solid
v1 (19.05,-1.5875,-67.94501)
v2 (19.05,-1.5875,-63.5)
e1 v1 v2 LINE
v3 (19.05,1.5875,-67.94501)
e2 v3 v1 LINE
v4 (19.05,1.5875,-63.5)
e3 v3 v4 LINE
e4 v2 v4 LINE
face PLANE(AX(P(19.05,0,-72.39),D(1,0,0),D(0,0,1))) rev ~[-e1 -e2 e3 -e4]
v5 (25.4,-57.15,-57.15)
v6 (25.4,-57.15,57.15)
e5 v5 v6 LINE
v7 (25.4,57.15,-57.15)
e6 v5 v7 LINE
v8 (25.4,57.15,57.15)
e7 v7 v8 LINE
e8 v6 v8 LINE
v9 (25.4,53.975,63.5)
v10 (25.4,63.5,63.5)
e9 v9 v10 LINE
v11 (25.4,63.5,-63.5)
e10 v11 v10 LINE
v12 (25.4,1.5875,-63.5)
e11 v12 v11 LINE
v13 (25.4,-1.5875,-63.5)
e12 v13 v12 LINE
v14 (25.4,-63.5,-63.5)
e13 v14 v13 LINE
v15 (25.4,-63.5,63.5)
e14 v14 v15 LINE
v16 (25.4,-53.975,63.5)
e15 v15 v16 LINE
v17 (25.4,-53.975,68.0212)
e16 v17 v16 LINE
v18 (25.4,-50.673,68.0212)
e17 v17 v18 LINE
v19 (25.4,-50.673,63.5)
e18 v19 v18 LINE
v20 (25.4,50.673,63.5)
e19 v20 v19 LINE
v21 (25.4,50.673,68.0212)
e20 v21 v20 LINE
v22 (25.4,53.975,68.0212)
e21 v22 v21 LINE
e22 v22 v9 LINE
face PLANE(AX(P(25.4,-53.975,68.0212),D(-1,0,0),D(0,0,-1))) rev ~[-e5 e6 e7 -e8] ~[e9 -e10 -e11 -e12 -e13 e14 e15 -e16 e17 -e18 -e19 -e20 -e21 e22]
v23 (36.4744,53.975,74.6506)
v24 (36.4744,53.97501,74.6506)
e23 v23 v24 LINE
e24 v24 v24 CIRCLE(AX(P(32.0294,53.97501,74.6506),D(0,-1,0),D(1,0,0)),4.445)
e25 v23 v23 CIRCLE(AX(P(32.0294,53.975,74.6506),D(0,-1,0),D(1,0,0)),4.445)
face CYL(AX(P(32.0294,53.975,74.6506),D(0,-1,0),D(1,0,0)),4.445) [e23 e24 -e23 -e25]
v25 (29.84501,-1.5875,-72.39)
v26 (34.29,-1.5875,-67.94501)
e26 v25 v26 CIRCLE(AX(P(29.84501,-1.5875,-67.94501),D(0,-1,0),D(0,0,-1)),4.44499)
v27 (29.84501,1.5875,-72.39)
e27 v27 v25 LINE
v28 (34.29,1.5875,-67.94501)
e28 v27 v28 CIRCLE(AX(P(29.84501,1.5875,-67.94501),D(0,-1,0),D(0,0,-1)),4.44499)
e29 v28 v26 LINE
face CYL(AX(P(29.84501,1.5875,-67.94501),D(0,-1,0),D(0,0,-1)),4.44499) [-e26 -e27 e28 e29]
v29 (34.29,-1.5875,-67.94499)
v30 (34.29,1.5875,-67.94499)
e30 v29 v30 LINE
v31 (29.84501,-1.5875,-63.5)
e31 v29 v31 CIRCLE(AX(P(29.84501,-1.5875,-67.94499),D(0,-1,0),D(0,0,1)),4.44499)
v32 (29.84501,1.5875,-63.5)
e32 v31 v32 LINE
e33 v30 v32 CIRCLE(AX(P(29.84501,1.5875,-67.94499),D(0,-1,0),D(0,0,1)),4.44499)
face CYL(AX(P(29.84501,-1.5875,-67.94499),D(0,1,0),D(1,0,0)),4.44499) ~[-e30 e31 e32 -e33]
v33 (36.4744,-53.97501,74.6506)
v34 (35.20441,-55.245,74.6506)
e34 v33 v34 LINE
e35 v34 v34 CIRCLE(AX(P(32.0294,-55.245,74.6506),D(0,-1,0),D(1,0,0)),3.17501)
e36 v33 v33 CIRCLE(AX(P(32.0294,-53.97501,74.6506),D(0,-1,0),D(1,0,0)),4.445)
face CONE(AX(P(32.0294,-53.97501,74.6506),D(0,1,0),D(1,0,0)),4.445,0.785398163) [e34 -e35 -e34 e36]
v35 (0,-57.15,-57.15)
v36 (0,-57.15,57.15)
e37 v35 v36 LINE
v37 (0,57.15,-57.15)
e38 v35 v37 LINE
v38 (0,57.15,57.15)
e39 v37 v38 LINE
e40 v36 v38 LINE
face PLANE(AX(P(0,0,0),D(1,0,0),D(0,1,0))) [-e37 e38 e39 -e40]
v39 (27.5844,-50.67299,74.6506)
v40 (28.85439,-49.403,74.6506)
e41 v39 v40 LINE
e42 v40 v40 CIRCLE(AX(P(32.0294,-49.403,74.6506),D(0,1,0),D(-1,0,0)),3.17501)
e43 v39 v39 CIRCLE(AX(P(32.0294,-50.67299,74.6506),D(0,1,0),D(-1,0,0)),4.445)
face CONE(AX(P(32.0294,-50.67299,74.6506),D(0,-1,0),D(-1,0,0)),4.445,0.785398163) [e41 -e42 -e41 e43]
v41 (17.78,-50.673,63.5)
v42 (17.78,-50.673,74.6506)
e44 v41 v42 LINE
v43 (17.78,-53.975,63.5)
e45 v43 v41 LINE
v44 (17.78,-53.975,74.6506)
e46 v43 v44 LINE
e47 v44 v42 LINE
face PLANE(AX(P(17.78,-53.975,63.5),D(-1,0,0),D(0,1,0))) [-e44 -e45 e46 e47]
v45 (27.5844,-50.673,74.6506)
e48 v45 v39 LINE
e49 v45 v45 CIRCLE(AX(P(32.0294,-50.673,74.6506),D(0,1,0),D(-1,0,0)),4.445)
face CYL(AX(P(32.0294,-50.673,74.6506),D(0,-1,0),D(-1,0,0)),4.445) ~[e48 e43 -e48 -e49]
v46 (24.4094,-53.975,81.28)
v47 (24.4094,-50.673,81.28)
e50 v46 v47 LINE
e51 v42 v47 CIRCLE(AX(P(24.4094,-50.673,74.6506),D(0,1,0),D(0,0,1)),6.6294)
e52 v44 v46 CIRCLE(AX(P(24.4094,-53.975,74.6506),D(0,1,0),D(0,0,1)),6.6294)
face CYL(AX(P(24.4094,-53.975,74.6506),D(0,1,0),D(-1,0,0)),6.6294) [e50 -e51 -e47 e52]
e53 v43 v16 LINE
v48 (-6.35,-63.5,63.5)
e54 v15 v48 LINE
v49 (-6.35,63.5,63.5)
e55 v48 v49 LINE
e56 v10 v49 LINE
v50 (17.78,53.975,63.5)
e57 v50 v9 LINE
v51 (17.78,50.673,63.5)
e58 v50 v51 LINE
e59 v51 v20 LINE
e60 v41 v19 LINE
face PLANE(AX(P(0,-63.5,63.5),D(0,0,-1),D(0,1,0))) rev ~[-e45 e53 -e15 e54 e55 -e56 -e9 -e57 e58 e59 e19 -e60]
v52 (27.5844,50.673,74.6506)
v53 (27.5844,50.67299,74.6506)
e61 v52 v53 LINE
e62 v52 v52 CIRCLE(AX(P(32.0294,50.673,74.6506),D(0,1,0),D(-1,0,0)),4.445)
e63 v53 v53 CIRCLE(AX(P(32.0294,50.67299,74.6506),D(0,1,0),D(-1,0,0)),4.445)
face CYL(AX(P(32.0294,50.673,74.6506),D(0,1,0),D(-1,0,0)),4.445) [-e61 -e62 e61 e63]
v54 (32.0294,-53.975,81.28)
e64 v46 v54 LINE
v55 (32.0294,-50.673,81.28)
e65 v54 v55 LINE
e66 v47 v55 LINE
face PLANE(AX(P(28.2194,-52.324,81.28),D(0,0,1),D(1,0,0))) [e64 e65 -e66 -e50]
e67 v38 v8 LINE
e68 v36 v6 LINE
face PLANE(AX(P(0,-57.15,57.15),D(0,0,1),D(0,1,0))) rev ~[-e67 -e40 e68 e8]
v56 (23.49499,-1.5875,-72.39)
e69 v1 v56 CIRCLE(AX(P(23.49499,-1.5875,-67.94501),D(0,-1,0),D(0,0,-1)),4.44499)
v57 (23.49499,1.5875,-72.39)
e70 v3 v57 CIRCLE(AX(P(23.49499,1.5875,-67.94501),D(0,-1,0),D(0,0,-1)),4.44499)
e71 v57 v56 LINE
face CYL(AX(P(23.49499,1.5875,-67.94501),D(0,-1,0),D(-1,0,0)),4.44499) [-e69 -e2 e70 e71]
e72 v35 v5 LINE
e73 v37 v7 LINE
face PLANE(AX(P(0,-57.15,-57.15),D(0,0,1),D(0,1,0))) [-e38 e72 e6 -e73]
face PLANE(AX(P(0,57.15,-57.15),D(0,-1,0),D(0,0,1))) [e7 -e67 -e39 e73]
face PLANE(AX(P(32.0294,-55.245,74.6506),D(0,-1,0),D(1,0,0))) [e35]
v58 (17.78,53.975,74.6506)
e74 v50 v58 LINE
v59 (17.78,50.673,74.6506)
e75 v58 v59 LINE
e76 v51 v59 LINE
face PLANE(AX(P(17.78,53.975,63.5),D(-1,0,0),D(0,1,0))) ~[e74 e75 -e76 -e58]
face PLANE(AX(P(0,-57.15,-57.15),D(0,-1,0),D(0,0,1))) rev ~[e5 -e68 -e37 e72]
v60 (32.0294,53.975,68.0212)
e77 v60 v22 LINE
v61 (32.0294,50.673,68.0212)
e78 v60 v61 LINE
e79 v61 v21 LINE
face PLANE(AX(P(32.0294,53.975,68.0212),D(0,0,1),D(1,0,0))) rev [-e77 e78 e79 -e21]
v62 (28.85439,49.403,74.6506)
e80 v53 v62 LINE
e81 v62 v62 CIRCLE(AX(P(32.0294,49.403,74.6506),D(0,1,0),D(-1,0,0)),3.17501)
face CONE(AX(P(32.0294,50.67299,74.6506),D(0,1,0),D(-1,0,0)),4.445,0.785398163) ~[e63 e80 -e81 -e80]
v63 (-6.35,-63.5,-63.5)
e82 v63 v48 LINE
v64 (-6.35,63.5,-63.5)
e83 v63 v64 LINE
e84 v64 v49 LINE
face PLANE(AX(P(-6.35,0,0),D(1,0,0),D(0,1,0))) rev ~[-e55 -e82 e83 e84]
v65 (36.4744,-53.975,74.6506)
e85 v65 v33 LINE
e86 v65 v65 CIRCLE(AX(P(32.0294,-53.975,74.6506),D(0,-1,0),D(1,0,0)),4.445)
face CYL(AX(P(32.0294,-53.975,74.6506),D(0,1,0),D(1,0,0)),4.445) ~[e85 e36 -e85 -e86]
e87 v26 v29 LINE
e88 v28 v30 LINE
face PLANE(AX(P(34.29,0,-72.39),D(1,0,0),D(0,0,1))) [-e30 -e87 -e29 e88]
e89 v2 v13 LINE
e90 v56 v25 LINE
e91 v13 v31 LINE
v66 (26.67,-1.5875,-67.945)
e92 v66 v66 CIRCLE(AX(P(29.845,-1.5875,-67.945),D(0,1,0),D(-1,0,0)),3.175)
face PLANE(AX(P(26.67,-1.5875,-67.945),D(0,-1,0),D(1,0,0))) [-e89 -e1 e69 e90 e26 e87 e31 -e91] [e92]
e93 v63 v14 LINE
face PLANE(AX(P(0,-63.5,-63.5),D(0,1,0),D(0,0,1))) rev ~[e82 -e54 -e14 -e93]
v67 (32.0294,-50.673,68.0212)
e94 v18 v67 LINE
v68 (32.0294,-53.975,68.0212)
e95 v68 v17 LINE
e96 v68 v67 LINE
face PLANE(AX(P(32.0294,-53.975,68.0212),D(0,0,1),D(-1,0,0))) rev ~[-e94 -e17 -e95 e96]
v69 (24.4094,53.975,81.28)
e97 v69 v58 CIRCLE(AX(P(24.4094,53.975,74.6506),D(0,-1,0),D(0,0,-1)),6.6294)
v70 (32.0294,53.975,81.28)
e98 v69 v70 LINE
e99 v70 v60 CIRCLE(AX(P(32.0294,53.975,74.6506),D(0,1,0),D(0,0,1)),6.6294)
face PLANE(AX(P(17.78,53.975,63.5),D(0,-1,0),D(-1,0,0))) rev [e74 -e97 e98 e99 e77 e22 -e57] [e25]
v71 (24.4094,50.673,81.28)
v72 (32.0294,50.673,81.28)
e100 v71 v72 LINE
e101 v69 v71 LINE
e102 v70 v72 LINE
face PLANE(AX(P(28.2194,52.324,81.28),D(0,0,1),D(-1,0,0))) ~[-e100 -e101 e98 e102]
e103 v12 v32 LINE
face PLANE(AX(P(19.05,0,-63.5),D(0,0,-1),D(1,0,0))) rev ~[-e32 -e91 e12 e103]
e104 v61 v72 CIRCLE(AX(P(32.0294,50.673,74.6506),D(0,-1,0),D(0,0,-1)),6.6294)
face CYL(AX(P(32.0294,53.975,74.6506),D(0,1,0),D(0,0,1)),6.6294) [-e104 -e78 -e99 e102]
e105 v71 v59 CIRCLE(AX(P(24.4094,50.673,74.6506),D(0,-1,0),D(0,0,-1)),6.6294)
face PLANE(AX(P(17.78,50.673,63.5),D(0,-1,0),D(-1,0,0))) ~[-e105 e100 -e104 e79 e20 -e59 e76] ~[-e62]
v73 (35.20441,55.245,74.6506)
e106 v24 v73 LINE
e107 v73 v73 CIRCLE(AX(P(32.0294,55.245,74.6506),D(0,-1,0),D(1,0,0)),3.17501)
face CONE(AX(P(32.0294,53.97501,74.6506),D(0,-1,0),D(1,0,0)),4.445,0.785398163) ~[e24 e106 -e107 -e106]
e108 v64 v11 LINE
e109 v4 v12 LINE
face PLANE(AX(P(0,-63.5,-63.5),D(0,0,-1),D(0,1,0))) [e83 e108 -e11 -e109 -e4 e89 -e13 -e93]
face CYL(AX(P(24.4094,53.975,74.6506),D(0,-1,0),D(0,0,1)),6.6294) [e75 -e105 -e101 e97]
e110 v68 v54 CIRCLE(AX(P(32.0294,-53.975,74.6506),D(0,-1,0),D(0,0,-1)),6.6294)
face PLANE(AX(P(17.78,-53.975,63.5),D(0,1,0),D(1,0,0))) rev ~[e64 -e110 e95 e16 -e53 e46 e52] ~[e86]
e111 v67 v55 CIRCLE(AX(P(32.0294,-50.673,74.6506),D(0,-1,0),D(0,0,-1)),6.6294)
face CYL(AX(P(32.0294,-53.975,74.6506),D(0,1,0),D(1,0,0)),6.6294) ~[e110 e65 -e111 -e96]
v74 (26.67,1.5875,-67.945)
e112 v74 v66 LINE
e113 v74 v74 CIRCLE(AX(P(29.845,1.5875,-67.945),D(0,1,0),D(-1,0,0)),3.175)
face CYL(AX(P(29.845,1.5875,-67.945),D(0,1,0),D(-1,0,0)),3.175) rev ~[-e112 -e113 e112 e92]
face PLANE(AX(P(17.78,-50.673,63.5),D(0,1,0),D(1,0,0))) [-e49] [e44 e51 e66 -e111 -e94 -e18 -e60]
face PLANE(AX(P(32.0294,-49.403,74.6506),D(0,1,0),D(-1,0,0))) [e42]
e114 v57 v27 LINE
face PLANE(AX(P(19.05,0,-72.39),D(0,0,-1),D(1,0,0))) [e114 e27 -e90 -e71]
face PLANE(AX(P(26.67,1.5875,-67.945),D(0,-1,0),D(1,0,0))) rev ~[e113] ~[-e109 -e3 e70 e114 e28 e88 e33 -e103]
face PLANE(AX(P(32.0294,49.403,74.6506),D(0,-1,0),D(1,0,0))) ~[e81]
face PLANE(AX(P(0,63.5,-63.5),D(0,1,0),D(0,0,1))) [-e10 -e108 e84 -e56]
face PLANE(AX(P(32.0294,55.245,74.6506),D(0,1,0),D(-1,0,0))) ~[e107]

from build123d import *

# Parameters (mm, degrees)
F0_W      = 127
F0_H      = 127
F0_W_2    = 114.3
F0_H_2    = 114.3
F1_DEPTH  = 25.4
F2_W      = 127
F2_H      = 127
F3_DEPTH  = 6.35
F4_W      = 20.8788
F4_H      = 3.302
F5_DEPTH  = 17.78
F6_R      = 6.6294
F8_DEPTH  = 6.35
F9_R      = 6.6294
F10_R     = 4.445
F11_DEPTH = 1.27
F12_R     = 4.445
F13_DEPTH = 1.27
F14_SIZE  = 1.26999
F15_W     = 15.24
F15_H     = 8.89
F16_DEPTH = 1.5875
F17_R     = 4.44499
F18_R     = 3.175
F19_DEPTH = 25.4


# Not quite as in the source:
# - a fillet or chamfer is up to 0.001 mm smaller than in the source, because OpenCascade refuses the exact size
# - a pattern or mirror of a feature is missing from the dataset's text; its kind, count and spacing are read off the source's solid


with BuildPart() as f1:
    # F0 (on Right) → F1 (new body)
    with BuildSketch(Plane.YZ):
        Rectangle(F0_W, F0_H)
        Rectangle(F0_W_2, F0_H_2, mode=Mode.SUBTRACT)
    extrude(amount=F1_DEPTH)

    # F2 (on Right) → F3 (join)
    with BuildSketch(Plane.YZ):
        Rectangle(F2_W, F2_H)
    extrude(amount=-F3_DEPTH)

    # F4 (on face) → F5 (join)
    with BuildSketch(Plane.XY.offset(63.5)):
        with Locations((28.2194, -52.324)):
            Rectangle(F4_W, F4_H)
    f5 = extrude(amount=F5_DEPTH)

    # F5_copies: F5 across plane
    add(f5.mirror(Plane.ZX))

    # F6
    f6_edges = [f1.edges().sort_by_distance(p)[0] for p in [
        (38.6588, -52.324, 81.28),
    ]]
    fillet(f6_edges, radius=F6_R)

    # F7 (on face) → F8 (cut)
    with BuildSketch(Plane.XZ.offset(53.975)):
        with BuildLine():
            ThreePointArc((32.0294, 81.28), (38.6588, 74.6506), (32.0294, 68.0212))
            Line((32.0294, 68.0212), (25.4, 68.0212))
            Line((25.4, 68.0212), (25.4, 63.5))
            Line((25.4, 63.5), (41.4029210806, 57.3826394975))
            Line((41.4029210806, 57.3826394975), (43.7219925225, 87.7940133214))
            Line((43.7219925225, 87.7940133214), (32.0294, 81.28))
        make_face()
    f8 = extrude(amount=-F8_DEPTH, mode=Mode.SUBTRACT)

    # F8_copies: F8 across plane
    add(f8.mirror(Plane.ZX), mode=Mode.SUBTRACT)

    # F9
    f9_edges = [f1.edges().sort_by_distance(p)[0] for p in [
        (17.78, -52.324, 81.28),
        (17.78, 52.324, 81.28),
    ]]
    fillet(f9_edges, radius=F9_R)

    # F10 (on face) → F11 (join)
    with BuildSketch(Plane.XZ.offset(53.975)):
        with Locations((32.0294, 74.6506)):
            Circle(F10_R)
    f11 = extrude(amount=F11_DEPTH)

    # F11_copies: F11 across plane
    add(f11.mirror(Plane.ZX))

    # F12 (on face) → F13 (join)
    with BuildSketch(Plane(origin=(0, -50.673, 0), x_dir=(-1, 0, 0), z_dir=(0, 1, 0))):
        with Locations((-32.0294, 74.6506)):
            Circle(F12_R)
    f13 = extrude(amount=F13_DEPTH)

    # F13_copies: F13 across plane
    add(f13.mirror(Plane.ZX))

    # F14 (size 1.27 in the source; OpenCascade refuses exactly that, so slightly less here)
    f14_edges = [f1.edges().sort_by_distance(p)[0] for p in [
        (27.5844, -55.245, 74.6506),
        (36.4744, -49.403, 74.6506),
        (27.5844, 55.245, 74.6506),
        (36.4744, 49.403, 74.6506),
    ]]
    chamfer(f14_edges, length=F14_SIZE)

    # F15 (on Front) → F16 (join, symmetric)
    with BuildSketch(Plane.XZ):
        with Locations((26.67, -67.945)):
            Rectangle(F15_W, F15_H)
    extrude(amount=F16_DEPTH, both=True)

    # F17 (radius 4.445 in the source; OpenCascade refuses exactly that, so slightly less here)
    f17_edges = [f1.edges().sort_by_distance(p)[0] for p in [
        (34.29, 0, -63.5),
        (34.29, 0, -72.39),
        (19.05, 0, -72.39),
    ]]
    fillet(f17_edges, radius=F17_R)

    # F18 (on face) → F19 (cut)
    with BuildSketch(Plane(origin=(0, 1.5875, 0), x_dir=(-1, 0, 0), z_dir=(0, 1, 0))):
        with Locations((-29.845, -67.945)):
            Circle(F18_R)
    extrude(amount=-F19_DEPTH, mode=Mode.SUBTRACT)


solid = f1.part
